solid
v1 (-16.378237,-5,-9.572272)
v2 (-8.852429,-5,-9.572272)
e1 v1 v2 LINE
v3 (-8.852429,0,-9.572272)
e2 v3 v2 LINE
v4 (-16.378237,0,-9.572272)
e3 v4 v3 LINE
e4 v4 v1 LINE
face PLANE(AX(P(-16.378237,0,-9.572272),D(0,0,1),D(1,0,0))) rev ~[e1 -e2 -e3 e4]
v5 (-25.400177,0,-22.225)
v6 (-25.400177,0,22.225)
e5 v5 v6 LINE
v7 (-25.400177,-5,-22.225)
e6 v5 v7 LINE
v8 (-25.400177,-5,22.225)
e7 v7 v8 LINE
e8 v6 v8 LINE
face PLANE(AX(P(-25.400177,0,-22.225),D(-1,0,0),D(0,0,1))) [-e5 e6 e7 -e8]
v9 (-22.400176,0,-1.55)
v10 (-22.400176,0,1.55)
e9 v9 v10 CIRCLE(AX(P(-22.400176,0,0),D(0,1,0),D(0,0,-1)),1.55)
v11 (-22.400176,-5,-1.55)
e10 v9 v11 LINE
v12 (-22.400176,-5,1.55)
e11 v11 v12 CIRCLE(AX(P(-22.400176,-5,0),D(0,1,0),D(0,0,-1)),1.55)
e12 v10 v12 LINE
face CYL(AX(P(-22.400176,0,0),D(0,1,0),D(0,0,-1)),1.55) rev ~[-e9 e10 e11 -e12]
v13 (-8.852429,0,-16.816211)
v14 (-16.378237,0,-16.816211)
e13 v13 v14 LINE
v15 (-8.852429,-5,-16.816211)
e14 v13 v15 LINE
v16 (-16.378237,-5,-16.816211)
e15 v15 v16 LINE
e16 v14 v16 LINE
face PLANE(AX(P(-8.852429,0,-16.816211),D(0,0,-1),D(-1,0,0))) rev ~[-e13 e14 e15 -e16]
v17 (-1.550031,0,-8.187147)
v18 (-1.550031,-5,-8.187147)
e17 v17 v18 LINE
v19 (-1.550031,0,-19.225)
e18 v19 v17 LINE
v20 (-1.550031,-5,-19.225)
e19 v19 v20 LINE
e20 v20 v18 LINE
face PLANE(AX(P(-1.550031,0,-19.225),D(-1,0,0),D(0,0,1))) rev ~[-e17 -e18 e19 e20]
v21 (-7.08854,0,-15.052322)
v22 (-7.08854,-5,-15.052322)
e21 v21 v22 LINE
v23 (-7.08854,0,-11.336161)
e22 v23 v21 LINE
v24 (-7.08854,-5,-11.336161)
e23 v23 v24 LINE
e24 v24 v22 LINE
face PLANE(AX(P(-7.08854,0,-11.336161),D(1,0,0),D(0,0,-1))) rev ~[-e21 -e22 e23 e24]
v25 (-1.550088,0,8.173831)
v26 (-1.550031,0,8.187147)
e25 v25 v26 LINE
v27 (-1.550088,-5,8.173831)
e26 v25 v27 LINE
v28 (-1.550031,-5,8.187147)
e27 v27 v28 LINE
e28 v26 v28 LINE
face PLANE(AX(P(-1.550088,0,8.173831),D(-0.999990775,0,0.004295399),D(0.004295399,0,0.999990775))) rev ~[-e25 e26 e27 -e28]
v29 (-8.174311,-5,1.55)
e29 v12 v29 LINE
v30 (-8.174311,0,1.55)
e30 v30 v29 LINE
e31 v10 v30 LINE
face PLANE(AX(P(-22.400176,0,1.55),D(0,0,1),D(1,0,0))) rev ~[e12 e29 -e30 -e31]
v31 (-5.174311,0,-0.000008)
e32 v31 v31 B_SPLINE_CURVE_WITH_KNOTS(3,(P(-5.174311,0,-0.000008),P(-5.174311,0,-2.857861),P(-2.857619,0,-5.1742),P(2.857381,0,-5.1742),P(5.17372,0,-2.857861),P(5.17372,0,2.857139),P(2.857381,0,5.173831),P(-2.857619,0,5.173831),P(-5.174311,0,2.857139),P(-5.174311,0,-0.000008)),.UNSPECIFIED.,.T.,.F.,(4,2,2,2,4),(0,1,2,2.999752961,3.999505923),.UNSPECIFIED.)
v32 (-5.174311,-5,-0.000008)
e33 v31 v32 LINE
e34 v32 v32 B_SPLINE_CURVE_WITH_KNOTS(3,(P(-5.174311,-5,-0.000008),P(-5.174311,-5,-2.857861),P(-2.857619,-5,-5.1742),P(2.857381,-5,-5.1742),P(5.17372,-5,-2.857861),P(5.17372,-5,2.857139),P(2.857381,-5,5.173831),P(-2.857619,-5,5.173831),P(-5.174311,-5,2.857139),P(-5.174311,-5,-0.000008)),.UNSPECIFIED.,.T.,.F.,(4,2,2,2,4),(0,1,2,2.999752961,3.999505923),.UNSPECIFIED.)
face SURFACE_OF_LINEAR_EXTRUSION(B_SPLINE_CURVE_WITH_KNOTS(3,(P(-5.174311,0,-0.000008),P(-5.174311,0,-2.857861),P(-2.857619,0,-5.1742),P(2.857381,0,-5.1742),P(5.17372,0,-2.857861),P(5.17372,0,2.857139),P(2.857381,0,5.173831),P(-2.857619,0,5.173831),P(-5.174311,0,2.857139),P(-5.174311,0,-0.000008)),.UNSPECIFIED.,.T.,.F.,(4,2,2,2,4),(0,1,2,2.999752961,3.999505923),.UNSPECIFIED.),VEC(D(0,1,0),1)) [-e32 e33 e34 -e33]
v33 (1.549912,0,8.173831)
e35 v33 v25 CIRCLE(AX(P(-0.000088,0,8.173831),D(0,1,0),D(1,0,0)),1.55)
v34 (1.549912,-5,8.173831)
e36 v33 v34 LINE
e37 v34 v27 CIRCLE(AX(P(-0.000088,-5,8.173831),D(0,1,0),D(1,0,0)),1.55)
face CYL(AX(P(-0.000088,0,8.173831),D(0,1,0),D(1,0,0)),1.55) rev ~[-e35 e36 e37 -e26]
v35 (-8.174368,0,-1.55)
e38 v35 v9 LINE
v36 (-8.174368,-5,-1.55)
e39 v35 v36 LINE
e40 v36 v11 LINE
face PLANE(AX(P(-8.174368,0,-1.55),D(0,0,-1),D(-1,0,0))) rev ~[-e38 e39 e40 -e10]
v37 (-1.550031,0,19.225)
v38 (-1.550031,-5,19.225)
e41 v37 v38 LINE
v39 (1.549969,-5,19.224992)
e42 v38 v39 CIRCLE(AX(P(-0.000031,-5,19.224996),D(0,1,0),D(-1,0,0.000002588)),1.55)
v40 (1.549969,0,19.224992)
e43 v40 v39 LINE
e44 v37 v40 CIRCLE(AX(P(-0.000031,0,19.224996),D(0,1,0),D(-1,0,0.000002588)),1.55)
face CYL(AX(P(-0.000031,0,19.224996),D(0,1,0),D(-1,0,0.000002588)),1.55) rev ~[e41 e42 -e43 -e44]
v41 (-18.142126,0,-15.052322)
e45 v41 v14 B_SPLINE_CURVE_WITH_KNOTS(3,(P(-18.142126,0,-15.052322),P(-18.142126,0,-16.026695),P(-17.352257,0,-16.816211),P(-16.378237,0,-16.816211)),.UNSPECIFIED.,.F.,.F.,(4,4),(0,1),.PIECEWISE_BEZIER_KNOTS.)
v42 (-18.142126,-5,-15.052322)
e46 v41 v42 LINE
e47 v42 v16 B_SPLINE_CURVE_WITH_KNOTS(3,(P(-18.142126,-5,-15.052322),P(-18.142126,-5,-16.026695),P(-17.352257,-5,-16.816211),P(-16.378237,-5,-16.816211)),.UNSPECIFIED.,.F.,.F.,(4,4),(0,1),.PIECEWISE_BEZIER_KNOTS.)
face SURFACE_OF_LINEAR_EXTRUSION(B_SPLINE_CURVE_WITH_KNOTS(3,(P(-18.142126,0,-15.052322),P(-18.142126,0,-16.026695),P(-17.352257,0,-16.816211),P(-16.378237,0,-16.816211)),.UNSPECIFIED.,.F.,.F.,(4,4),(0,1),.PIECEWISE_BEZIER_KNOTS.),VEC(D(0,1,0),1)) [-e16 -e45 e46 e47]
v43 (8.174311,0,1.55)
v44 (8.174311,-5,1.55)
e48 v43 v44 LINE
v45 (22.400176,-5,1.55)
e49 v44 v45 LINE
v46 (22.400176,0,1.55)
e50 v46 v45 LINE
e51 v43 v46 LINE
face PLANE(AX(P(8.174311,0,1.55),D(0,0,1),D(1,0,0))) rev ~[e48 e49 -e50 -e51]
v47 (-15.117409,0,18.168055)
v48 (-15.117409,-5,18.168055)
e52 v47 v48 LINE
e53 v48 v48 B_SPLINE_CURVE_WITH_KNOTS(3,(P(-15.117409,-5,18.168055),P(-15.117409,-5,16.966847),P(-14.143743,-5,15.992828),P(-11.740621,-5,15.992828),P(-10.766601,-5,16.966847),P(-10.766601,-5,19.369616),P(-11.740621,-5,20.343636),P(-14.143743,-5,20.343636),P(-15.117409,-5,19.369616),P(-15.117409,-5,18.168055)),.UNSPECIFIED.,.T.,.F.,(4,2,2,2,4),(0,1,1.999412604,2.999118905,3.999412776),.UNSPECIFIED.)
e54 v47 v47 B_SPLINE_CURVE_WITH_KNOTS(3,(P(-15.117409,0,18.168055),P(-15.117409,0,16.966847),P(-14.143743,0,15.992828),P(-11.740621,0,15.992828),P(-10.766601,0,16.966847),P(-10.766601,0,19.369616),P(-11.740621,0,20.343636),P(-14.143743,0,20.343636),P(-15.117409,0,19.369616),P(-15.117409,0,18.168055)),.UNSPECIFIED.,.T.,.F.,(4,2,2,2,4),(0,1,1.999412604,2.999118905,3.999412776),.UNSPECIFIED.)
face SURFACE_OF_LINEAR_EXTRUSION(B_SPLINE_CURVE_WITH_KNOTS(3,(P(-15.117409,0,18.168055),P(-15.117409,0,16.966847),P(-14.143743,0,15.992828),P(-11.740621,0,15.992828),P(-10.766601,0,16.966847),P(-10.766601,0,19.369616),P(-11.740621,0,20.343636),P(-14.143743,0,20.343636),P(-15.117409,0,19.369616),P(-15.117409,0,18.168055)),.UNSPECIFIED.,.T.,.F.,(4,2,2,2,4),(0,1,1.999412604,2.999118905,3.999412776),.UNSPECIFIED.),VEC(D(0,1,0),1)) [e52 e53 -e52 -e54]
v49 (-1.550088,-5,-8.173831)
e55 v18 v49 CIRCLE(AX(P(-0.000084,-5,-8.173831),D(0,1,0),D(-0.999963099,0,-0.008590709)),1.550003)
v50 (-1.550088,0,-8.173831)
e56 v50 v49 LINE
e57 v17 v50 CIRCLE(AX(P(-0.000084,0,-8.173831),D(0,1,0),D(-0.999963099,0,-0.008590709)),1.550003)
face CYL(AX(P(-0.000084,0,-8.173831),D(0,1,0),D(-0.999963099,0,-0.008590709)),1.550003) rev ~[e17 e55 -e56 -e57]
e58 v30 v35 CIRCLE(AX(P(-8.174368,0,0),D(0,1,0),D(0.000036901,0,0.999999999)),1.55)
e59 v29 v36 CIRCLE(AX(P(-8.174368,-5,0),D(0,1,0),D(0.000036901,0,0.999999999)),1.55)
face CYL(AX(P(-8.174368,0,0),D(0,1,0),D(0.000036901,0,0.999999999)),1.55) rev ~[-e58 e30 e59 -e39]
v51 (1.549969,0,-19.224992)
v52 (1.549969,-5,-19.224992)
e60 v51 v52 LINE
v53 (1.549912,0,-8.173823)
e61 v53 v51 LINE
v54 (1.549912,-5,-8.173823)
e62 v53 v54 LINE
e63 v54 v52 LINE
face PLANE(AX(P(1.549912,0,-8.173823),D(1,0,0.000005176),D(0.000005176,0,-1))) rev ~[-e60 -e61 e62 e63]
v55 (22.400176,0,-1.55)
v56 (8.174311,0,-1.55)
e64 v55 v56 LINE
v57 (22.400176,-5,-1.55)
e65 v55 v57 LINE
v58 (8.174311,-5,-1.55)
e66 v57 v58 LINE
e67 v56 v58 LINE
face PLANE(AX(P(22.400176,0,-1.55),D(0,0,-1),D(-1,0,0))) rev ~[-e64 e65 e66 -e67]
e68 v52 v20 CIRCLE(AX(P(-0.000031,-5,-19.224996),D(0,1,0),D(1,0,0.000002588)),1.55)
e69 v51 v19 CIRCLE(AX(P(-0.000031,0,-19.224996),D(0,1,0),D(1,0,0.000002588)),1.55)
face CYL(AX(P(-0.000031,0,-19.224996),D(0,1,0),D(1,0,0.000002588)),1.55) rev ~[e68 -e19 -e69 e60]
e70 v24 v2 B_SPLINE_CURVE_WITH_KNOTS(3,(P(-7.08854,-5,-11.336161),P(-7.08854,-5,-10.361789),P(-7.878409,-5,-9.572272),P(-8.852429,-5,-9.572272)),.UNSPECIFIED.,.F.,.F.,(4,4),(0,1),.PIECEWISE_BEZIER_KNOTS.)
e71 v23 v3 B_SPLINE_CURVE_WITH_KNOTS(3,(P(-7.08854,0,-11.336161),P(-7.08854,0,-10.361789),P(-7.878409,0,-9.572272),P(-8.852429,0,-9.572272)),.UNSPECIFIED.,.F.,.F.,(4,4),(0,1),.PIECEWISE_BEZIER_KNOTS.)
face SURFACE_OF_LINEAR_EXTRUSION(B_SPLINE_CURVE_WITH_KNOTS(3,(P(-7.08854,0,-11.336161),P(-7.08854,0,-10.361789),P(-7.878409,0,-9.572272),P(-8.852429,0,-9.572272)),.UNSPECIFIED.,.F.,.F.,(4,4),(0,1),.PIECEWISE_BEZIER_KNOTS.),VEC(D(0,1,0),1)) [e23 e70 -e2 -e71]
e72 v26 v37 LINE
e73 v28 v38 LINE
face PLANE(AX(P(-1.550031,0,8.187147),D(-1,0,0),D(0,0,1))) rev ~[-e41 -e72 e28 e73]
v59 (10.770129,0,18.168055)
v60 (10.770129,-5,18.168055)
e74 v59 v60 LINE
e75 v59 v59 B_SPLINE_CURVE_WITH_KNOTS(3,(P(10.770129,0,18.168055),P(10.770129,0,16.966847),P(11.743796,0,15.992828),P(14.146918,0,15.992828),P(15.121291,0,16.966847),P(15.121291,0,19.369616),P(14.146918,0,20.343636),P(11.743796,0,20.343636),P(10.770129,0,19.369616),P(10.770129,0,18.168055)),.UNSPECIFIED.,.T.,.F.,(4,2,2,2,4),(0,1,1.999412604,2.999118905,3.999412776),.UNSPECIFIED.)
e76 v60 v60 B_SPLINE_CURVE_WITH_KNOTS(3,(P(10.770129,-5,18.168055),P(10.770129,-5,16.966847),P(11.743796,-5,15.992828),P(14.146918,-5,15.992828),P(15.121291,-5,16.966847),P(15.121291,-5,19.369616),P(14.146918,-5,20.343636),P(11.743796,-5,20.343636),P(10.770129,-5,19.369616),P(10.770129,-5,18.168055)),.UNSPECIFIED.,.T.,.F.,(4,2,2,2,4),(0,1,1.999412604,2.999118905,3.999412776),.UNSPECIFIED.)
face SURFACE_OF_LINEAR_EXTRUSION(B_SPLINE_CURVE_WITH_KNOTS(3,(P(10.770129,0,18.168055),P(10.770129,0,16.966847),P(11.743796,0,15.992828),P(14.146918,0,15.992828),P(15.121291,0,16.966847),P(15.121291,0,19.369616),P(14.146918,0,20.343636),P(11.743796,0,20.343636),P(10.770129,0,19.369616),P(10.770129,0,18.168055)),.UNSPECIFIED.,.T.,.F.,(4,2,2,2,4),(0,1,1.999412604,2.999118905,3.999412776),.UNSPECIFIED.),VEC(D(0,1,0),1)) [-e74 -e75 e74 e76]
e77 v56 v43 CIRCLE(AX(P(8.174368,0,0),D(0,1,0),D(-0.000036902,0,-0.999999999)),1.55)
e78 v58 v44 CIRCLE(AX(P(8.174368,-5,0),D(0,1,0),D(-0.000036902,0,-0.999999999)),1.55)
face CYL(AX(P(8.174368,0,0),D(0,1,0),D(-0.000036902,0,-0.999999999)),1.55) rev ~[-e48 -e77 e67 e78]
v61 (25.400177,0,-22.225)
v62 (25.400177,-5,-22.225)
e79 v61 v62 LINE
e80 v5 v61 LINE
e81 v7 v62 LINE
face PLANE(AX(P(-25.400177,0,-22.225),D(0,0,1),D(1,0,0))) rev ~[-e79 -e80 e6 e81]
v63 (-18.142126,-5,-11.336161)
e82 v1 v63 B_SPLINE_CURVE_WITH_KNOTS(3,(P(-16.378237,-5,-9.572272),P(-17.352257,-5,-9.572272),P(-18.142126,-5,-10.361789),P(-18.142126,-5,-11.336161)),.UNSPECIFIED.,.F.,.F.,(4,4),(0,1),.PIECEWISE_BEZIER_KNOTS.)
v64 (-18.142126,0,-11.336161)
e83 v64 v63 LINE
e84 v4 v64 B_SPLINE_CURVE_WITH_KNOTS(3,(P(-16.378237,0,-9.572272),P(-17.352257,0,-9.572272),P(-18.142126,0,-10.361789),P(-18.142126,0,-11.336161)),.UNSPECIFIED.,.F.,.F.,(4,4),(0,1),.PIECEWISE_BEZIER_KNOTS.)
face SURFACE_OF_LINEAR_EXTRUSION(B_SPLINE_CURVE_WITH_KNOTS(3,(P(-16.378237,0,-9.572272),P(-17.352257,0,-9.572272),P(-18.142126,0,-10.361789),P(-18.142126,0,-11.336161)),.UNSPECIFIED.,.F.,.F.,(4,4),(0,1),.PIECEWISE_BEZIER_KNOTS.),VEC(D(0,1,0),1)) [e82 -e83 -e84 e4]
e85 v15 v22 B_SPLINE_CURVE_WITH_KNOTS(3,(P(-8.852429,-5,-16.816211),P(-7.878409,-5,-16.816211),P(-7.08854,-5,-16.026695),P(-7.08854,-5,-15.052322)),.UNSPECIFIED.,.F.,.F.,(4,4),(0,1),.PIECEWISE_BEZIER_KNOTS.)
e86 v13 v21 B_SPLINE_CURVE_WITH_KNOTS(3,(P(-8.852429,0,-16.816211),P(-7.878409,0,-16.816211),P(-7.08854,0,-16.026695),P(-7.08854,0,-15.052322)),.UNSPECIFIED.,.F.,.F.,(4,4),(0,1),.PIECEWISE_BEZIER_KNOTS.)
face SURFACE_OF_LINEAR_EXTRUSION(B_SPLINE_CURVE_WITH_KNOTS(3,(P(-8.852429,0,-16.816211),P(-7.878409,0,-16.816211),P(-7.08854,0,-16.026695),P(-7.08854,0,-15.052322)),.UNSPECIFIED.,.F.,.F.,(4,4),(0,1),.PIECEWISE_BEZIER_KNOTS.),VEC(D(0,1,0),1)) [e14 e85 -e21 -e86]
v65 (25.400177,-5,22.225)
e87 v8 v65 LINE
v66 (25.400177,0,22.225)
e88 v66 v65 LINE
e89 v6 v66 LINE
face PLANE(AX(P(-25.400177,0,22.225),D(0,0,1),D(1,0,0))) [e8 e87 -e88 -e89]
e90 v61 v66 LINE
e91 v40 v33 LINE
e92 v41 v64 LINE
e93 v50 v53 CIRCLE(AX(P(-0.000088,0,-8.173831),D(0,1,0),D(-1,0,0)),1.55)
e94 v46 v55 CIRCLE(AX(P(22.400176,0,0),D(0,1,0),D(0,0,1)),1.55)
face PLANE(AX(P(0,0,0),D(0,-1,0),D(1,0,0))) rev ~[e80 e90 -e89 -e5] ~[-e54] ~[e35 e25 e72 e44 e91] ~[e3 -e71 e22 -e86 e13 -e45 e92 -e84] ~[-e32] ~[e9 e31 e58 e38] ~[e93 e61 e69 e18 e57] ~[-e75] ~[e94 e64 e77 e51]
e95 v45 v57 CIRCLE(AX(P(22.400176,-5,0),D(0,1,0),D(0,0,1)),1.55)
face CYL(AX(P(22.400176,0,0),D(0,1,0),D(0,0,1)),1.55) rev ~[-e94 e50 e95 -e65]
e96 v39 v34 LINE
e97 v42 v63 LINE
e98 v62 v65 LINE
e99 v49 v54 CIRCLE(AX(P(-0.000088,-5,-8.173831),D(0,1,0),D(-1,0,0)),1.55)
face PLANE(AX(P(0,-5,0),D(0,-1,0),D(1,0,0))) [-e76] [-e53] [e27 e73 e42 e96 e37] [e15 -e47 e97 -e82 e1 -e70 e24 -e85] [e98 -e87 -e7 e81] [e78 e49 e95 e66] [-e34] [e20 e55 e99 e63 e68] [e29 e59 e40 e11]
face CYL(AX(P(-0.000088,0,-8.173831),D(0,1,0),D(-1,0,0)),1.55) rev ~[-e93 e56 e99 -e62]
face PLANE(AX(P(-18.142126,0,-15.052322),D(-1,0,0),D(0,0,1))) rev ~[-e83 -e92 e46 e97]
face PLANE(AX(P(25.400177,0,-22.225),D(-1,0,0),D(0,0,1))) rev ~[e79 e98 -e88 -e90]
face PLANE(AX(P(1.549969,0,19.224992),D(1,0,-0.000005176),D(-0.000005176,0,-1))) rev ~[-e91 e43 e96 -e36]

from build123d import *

# Parameters (mm, degrees)
F0_W     = 50.800353
F0_H     = 44.45
F1_DEPTH = 5


# Not quite as in the source:
# - ends of sketch curves that miss each other by under 0.0002 mm in the source are joined


with BuildPart() as f1:
    # F0 (on Front) → F1 (new body)
    with BuildSketch(Plane.XZ):
        with Locations((5e-07, 0)):
            Rectangle(F0_W, F0_H)
        with BuildLine():
            add(Edge.make_bspline(
                [(-7.08854, -11.336161), (-7.08854, -10.361789), (-7.878409, -9.572272), (-8.852429, -9.572272)],
                knots=[0, 0, 0, 0, 1, 1, 1, 1], degree=3))
            Line((-7.08854, -11.336161), (-7.08854, -15.052322))
            add(Edge.make_bspline(
                [(-8.852429, -16.816211), (-7.878409, -16.816211), (-7.08854, -16.026695), (-7.08854, -15.052322)],
                knots=[0, 0, 0, 0, 1, 1, 1, 1], degree=3))
            Line((-8.852429, -16.816211), (-16.378237, -16.816211))
            add(Edge.make_bspline(
                [(-18.142126, -15.052322), (-18.142126, -16.026695), (-17.352257, -16.816211), (-16.378237, -16.816211)],
                knots=[0, 0, 0, 0, 1, 1, 1, 1], degree=3))
            Line((-18.142126, -15.052322), (-18.142126, -11.336161))
            add(Edge.make_bspline(
                [(-16.378237, -9.572272), (-17.352257, -9.572272), (-18.142126, -10.361789), (-18.142126, -11.336161)],
                knots=[0, 0, 0, 0, 1, 1, 1, 1], degree=3))
            Line((-16.378237, -9.572272), (-8.852429, -9.572272))
        make_face(mode=Mode.SUBTRACT)
        with BuildLine():
            Line((-1.5500305536, -19.2250000002), (-1.5500305536, -8.1871465892))
            ThreePointArc((-1.5500305536, -8.1871465892), (-1.5500734508, -8.1804888446), (-1.55008775, -8.1738309772))
            ThreePointArc((-1.55008775, -8.1738309772), (-9.17611e-05, -6.6238309772), (1.54991225, -8.173822955))
            Line((1.54991225, -8.173822955), (1.5499694464, -19.224991978))
            ThreePointArc((1.5499694464, -19.224991978), (-2.65425e-05, -20.7749959891), (-1.5500305536, -19.2250000002))
        make_face(mode=Mode.SUBTRACT)
        with BuildLine():
            add(Edge.make_bspline(
                [(-0.0001188036, 5.1738309774), (-2.8576188036, 5.1738309774), (-5.1743108036, 2.8571389774), (-5.1743108036, -8.0226e-06)],
                knots=[0, 0, 0, 0, 1, 1, 1, 1], degree=3))
            add(Edge.make_bspline(
                [(5.1737201964, -8.0226e-06), (5.1737201964, 2.8571389774), (2.8573811964, 5.1738309774), (-0.0001188036, 5.1738309774)],
                knots=[0, 0, 0, 0, 1, 1, 1, 1], degree=3))
            add(Edge.make_bspline(
                [(-0.0001188036, -5.1742000226), (2.8573811964, -5.1742000226), (5.1737201964, -2.8578610226), (5.1737201964, -8.0226e-06)],
                knots=[0, 0, 0, 0, 1, 1, 1, 1], degree=3))
            add(Edge.make_bspline(
                [(-5.1743108036, -8.0226e-06), (-5.1743108036, -2.8578610226), (-2.8576188036, -5.1742000226), (-0.0001188036, -5.1742000226)],
                knots=[0, 0, 0, 0, 1, 1, 1, 1], degree=3))
        make_face(mode=Mode.SUBTRACT)
        with BuildLine():
            Line((-22.400176, 1.55), (-8.1743108036, 1.55))
            ThreePointArc((-8.1743108036, 1.55), (-6.624368, 0), (-8.174368, -1.55))
            Line((-8.174368, -1.55), (-22.400176, -1.55))
            ThreePointArc((-22.400176, -1.55), (-23.950176, 0), (-22.400176, 1.55))
        make_face(mode=Mode.SUBTRACT)
        with BuildLine():
            add(Edge.make_bspline(
                [(-12.941829, 20.343636), (-14.143743, 20.343636), (-15.117409, 19.369616), (-15.117409, 18.168055)],
                knots=[0, 0, 0, 0, 1, 1, 1, 1], degree=3))
            add(Edge.make_bspline(
                [(-10.766601, 18.168055), (-10.766601, 19.369616), (-11.740621, 20.343636), (-12.941829, 20.343636)],
                knots=[0, 0, 0, 0, 1, 1, 1, 1], degree=3))
            add(Edge.make_bspline(
                [(-12.941829, 15.992828), (-11.740621, 15.992828), (-10.766601, 16.966847), (-10.766601, 18.168055)],
                knots=[0, 0, 0, 0, 1, 1, 1, 1], degree=3))
            add(Edge.make_bspline(
                [(-15.117409, 18.168055), (-15.117409, 16.966847), (-14.143743, 15.992828), (-12.941829, 15.992828)],
                knots=[0, 0, 0, 0, 1, 1, 1, 1], degree=3))
        make_face(mode=Mode.SUBTRACT)
        with BuildLine():
            Line((-1.5500305536, 8.1871465892), (-1.5500305536, 19.2250000002))
            ThreePointArc((-1.5500305536, 19.2250000002), (-2.65425e-05, 20.7749959891), (1.5499694464, 19.224991978))
            Line((1.5499694464, 19.224991978), (1.54991225, 8.1738309772))
            ThreePointArc((1.54991225, 8.1738309772), (-9.17611e-05, 6.6238309772), (-1.55008775, 8.1738309772))
            Line((-1.55008775, 8.1738309772), (-1.5500305536, 8.1871465892))
        make_face(mode=Mode.SUBTRACT)
        with BuildLine():
            Line((8.1743108036, 1.55), (22.400176, 1.55))
            ThreePointArc((22.400176, 1.55), (23.950176, 0), (22.400176, -1.55))
            Line((22.400176, -1.55), (8.1743108036, -1.55))
            ThreePointArc((8.1743108036, -1.55), (6.624368, 0), (8.1743108036, 1.55))
        make_face(mode=Mode.SUBTRACT)
        with BuildLine():
            add(Edge.make_bspline(
                [(12.94571, 20.343636), (11.743796, 20.343636), (10.770129, 19.369616), (10.770129, 18.168055)],
                knots=[0, 0, 0, 0, 1, 1, 1, 1], degree=3))
            add(Edge.make_bspline(
                [(15.121291, 18.168055), (15.121291, 19.369616), (14.146918, 20.343636), (12.94571, 20.343636)],
                knots=[0, 0, 0, 0, 1, 1, 1, 1], degree=3))
            add(Edge.make_bspline(
                [(12.94571, 15.992828), (14.146918, 15.992828), (15.121291, 16.966847), (15.121291, 18.168055)],
                knots=[0, 0, 0, 0, 1, 1, 1, 1], degree=3))
            add(Edge.make_bspline(
                [(10.770129, 18.168055), (10.770129, 16.966847), (11.743796, 15.992828), (12.94571, 15.992828)],
                knots=[0, 0, 0, 0, 1, 1, 1, 1], degree=3))
        make_face(mode=Mode.SUBTRACT)
    extrude(amount=F1_DEPTH)


solid = f1.part
